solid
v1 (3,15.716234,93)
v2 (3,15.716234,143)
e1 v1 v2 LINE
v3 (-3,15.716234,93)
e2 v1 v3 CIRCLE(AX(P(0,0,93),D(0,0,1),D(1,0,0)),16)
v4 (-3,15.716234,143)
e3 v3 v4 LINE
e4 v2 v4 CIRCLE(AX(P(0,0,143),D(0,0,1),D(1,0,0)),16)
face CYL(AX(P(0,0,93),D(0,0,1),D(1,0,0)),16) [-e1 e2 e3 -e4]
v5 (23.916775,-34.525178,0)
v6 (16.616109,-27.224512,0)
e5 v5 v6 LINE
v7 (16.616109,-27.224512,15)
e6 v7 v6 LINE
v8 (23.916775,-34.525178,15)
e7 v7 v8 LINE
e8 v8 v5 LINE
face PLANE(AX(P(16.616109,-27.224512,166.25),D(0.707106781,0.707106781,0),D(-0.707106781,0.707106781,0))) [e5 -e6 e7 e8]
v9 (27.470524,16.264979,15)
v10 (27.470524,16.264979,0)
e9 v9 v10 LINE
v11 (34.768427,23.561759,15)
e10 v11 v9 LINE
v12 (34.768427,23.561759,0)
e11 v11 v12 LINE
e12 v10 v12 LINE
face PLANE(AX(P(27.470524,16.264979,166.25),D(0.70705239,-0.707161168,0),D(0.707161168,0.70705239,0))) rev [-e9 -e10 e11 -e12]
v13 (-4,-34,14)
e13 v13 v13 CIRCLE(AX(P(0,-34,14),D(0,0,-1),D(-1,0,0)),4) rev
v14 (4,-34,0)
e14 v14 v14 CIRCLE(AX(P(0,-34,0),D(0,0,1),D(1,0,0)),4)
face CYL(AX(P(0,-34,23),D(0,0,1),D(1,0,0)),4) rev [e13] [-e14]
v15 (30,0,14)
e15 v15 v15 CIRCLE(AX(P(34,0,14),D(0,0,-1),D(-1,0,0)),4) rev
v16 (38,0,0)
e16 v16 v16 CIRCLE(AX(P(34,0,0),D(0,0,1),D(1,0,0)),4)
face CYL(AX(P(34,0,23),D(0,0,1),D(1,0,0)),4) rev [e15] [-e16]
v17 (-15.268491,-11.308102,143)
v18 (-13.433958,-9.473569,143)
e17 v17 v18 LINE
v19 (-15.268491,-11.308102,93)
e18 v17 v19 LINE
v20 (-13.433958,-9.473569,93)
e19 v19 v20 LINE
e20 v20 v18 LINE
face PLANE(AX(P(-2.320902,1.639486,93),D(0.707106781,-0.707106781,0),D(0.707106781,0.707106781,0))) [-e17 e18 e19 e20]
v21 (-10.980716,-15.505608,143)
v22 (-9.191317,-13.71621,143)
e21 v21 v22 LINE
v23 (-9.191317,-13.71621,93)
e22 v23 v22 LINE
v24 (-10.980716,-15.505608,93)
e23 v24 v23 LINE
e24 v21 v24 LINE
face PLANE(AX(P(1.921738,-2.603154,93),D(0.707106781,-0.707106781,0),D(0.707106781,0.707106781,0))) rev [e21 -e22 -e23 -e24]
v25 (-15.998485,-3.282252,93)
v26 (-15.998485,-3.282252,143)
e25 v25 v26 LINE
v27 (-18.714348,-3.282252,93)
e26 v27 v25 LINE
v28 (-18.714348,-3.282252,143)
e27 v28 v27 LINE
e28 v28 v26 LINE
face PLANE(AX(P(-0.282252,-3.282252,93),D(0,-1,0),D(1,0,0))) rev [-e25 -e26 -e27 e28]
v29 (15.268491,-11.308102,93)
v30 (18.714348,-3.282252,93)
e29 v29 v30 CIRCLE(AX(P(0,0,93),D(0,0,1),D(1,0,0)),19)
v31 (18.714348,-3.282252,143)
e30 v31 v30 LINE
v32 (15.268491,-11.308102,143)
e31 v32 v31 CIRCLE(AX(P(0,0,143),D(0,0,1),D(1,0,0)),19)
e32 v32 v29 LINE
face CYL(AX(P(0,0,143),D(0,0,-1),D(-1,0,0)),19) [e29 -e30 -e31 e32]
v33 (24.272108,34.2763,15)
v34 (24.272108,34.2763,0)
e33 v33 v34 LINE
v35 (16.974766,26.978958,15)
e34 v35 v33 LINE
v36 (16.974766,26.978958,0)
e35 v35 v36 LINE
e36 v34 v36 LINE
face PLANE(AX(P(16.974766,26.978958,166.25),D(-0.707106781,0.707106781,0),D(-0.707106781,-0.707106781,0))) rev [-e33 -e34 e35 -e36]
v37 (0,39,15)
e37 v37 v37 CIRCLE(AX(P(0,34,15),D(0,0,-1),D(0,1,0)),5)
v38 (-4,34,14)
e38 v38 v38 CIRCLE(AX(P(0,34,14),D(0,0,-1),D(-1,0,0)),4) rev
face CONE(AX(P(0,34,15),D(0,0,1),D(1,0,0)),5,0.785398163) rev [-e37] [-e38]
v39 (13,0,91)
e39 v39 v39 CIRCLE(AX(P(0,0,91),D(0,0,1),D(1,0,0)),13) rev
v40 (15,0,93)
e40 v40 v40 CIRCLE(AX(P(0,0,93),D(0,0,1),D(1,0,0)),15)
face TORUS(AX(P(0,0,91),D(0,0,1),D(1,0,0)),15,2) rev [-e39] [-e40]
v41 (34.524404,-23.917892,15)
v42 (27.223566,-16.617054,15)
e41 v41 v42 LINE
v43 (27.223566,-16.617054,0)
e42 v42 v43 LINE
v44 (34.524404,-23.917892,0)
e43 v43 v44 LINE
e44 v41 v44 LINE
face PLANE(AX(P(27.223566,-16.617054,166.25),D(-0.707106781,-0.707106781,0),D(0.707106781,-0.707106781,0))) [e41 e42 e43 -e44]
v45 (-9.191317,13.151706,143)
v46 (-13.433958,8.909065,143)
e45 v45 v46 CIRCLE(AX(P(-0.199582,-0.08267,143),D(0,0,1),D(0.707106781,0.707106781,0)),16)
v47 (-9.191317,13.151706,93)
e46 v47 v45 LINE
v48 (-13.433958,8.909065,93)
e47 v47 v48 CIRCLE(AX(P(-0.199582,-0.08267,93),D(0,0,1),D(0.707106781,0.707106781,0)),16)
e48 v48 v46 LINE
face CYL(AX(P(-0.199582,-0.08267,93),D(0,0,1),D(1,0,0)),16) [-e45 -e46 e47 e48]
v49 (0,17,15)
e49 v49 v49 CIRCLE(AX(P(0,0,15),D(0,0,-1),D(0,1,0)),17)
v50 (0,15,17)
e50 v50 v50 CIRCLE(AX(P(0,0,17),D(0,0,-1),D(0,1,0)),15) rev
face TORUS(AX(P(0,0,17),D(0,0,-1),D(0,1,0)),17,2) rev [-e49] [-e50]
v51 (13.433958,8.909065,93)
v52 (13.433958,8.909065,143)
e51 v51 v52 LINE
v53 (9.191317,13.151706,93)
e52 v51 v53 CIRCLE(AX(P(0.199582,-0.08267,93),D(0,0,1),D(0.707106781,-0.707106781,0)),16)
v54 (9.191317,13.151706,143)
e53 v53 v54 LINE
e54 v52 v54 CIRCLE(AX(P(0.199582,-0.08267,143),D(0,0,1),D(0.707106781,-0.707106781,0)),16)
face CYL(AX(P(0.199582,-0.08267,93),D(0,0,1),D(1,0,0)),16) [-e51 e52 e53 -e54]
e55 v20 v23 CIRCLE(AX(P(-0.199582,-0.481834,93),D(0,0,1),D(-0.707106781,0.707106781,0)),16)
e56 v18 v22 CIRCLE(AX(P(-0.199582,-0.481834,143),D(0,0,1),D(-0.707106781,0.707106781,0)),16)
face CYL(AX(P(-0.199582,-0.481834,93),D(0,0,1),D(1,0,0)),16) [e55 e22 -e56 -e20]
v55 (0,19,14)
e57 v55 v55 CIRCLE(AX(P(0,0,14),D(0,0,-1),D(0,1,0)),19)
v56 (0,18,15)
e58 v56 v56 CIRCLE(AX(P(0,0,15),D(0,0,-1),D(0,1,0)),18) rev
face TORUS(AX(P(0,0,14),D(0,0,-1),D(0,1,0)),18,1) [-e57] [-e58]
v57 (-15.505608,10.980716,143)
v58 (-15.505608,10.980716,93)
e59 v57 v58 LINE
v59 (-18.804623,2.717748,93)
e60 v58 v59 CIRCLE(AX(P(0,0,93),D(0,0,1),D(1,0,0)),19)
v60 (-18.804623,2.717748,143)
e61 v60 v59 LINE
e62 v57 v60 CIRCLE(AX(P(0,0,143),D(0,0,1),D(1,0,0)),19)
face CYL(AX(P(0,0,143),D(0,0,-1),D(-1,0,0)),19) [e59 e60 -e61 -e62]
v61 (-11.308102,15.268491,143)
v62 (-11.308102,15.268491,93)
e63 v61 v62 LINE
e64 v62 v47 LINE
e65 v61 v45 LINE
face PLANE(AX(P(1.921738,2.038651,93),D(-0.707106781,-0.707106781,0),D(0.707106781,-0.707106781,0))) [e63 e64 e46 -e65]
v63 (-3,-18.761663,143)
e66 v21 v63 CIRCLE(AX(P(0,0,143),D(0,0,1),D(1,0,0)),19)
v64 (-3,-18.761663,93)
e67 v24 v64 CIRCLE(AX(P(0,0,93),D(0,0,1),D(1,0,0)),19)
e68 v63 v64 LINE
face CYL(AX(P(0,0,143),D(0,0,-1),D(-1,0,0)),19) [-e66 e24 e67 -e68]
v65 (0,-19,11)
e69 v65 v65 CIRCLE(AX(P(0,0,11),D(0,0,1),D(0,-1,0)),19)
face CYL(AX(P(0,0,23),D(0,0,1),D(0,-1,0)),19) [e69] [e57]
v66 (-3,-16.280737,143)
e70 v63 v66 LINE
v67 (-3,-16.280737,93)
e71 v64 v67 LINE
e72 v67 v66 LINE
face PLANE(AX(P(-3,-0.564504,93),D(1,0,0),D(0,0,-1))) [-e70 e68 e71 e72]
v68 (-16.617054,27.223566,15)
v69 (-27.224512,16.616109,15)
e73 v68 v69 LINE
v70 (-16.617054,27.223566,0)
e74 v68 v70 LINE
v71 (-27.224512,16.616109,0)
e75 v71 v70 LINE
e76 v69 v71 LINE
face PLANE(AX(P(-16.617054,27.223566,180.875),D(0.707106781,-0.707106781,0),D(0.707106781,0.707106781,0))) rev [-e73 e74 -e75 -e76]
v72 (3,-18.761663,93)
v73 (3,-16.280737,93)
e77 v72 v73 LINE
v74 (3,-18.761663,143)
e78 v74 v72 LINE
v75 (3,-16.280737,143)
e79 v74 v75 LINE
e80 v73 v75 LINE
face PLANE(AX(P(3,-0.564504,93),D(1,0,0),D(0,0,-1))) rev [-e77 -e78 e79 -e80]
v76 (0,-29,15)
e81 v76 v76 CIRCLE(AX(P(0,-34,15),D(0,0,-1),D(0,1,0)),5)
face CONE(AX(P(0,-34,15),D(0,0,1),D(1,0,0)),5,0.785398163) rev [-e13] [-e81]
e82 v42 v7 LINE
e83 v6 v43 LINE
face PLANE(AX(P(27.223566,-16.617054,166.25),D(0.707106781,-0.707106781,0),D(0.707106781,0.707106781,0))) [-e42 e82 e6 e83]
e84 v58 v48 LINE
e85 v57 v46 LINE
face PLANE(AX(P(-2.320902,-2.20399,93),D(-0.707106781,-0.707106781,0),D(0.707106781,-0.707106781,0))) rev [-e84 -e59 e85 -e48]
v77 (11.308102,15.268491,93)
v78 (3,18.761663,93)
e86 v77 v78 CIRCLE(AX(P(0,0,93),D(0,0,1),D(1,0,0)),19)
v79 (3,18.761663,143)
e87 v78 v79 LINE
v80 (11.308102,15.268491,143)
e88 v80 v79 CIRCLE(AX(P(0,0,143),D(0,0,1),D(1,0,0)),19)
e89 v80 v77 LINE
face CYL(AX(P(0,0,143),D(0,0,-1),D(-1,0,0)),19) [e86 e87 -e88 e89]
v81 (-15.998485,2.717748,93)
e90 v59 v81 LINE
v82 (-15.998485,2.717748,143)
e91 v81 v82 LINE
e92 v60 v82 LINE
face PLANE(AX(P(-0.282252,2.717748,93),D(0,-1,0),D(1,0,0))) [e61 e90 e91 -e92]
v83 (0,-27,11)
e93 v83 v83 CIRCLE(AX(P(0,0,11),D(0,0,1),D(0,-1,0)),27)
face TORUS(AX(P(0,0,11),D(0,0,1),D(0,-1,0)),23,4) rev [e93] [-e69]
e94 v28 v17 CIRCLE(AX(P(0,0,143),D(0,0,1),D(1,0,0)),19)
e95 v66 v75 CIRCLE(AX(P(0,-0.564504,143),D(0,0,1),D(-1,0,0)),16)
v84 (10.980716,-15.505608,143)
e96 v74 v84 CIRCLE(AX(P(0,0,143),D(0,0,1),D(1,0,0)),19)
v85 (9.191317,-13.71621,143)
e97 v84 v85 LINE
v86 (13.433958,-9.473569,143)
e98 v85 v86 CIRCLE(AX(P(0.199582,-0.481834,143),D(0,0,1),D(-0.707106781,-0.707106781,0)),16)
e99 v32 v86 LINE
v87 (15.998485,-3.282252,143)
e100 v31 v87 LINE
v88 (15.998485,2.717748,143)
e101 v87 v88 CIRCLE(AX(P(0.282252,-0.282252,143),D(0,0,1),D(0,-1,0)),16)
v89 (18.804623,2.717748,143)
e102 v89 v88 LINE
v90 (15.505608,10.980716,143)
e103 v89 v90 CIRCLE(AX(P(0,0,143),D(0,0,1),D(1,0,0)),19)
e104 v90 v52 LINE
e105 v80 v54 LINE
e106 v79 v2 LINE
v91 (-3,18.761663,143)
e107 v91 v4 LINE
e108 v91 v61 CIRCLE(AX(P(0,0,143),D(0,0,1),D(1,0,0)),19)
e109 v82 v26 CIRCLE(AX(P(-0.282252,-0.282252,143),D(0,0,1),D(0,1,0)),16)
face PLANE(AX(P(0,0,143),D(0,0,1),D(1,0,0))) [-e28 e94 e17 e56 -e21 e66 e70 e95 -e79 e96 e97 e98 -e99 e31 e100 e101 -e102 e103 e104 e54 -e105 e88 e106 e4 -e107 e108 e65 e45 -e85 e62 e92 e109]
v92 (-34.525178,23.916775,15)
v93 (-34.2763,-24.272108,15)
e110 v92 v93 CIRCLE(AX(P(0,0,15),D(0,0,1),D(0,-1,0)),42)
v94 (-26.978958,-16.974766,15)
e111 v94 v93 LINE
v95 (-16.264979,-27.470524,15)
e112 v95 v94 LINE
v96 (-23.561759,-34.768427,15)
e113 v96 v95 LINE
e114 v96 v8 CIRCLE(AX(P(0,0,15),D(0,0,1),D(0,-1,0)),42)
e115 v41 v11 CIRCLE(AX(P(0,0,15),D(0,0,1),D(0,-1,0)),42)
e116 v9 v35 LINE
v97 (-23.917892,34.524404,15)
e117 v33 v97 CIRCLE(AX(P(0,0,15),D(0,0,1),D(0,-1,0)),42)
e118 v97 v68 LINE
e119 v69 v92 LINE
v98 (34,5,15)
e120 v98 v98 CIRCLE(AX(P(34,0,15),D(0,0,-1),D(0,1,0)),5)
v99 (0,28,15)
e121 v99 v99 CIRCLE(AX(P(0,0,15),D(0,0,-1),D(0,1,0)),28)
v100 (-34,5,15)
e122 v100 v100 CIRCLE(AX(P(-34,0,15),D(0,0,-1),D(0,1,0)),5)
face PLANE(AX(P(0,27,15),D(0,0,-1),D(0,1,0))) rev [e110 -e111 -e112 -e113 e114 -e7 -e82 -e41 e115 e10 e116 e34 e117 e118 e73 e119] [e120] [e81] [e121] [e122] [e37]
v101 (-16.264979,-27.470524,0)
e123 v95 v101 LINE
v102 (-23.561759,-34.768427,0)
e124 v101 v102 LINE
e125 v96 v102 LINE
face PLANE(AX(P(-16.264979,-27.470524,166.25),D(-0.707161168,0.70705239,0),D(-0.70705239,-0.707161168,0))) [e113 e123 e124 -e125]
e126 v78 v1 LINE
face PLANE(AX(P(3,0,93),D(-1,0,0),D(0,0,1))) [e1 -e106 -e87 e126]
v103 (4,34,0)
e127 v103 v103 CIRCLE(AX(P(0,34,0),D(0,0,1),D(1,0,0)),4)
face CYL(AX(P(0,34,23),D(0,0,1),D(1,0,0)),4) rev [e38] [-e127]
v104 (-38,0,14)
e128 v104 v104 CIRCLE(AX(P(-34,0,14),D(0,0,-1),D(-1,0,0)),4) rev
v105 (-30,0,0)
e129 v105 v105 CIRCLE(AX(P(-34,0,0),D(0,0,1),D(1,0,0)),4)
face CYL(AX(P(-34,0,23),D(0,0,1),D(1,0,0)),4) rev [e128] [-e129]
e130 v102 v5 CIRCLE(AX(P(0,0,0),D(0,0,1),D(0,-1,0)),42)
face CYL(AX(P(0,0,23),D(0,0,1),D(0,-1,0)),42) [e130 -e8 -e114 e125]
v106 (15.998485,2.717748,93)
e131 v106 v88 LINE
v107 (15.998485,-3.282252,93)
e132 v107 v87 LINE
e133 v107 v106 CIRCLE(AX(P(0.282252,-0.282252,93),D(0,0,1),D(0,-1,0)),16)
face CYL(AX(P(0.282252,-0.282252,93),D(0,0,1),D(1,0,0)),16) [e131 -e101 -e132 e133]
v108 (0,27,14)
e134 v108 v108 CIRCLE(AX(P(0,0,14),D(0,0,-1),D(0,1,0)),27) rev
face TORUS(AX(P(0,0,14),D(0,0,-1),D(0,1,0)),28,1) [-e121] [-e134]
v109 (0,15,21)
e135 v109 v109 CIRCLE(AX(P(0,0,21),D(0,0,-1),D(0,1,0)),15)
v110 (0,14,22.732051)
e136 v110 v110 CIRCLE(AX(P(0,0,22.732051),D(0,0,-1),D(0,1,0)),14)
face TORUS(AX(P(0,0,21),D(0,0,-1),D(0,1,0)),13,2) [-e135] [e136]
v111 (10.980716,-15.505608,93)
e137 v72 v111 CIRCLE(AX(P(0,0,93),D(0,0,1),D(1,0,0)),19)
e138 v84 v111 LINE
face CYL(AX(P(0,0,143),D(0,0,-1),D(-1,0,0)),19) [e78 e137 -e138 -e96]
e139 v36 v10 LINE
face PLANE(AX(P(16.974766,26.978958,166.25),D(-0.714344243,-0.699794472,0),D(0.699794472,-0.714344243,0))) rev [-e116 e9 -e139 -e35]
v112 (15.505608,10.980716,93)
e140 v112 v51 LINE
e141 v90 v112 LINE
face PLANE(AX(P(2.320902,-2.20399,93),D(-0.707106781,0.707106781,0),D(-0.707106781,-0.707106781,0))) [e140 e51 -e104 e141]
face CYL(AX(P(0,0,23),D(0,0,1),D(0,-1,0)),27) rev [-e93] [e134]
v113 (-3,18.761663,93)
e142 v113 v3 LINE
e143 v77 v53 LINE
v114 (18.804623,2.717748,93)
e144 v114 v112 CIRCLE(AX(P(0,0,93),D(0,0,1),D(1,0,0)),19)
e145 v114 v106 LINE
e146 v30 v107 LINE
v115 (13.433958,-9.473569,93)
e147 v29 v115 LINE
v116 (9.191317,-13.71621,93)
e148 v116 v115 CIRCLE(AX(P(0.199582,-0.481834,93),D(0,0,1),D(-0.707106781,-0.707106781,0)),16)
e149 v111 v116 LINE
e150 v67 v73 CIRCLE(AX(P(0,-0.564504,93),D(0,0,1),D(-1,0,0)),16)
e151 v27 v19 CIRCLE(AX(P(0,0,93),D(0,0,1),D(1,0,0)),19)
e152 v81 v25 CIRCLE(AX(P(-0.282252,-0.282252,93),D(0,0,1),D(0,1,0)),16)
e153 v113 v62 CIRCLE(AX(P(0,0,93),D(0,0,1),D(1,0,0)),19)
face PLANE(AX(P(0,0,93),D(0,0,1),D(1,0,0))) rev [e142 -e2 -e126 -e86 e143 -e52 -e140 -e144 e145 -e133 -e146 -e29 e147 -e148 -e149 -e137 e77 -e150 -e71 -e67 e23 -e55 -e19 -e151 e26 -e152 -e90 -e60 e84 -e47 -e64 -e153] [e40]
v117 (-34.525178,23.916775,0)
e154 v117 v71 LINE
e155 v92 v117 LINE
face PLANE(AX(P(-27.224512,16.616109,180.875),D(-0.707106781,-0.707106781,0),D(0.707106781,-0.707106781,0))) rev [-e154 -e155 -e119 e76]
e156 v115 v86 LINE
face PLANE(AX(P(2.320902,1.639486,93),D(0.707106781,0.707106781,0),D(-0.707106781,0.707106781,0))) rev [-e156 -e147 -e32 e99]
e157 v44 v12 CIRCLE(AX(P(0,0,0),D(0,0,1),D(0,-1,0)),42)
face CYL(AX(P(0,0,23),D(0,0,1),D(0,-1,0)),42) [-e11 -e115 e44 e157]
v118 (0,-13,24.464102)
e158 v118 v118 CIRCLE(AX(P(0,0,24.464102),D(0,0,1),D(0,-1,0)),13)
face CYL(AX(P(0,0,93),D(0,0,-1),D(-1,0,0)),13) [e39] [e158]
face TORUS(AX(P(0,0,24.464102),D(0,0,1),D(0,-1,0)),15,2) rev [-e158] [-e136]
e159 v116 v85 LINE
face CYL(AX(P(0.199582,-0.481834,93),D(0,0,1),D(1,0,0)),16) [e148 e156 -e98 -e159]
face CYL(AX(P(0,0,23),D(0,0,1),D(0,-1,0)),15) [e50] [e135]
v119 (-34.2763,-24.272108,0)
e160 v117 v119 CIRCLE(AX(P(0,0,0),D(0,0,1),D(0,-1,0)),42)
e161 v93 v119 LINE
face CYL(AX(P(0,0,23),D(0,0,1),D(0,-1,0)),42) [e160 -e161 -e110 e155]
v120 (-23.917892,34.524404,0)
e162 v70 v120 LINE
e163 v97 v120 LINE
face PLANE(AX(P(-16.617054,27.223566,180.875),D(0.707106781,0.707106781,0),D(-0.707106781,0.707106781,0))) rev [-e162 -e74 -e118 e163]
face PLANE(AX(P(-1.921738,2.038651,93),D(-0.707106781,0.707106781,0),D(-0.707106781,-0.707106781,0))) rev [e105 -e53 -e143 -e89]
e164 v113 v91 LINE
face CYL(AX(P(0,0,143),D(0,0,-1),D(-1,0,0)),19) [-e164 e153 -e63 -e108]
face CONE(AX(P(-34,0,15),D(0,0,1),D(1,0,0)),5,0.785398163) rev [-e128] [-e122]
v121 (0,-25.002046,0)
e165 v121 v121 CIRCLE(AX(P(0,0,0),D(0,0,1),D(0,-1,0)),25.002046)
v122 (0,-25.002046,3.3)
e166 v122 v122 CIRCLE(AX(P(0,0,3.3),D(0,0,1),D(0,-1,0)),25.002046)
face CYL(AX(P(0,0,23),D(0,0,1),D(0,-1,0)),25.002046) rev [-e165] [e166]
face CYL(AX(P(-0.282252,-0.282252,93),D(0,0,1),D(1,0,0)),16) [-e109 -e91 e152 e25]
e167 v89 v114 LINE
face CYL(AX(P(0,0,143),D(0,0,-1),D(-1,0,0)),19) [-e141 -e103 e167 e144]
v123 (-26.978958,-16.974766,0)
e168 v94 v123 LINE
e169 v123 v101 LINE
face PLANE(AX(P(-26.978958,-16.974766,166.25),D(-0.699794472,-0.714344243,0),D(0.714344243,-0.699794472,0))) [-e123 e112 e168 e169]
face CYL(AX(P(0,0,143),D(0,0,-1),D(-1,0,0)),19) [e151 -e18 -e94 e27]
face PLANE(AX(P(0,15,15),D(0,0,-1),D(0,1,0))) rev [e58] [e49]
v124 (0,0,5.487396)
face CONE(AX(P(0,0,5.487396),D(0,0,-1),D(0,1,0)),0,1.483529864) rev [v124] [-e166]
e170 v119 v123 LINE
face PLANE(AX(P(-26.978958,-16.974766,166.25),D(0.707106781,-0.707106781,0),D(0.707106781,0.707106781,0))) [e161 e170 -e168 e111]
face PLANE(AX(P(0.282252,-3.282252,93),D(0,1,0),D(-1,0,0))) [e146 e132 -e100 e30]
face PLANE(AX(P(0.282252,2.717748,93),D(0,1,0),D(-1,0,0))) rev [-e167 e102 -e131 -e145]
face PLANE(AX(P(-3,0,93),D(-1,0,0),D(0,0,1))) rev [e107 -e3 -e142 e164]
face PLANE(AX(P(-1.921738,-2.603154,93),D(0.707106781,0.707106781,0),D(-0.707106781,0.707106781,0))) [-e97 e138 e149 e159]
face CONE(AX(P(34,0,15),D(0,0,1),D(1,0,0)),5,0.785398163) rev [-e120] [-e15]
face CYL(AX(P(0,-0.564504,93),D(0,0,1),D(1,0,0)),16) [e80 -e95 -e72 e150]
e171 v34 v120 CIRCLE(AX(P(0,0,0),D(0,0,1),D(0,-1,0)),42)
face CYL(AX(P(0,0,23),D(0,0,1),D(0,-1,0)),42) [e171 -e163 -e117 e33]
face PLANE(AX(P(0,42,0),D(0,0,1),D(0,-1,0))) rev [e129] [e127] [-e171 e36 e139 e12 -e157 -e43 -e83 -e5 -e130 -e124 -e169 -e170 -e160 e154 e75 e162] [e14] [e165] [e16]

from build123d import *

# Parameters (mm, degrees)
F_8_0MM_DOWEL_HOLE1_D           = 8
F_8_0MM_DOWEL_HOLE1_CSINK_D     = 8.05
F_8_0MM_DOWEL_HOLE1_CSINK_ANGLE = 90
CUT_EXTRUDE1_DEPTH              = 62.26173357
CUT_EXTRUDE2_DEPTH              = 62.26173357
SKETCH12_R                      = 13
BOSS_EXTRUDE3_DEPTH             = 70
SKETCH16_R                      = 19
BOSS_EXTRUDE4_DEPTH             = 50
CUT_EXTRUDE5_START              = -50
CUT_EXTRUDE5_DEPTH              = 50
CIRPATTERN2_COUNT               = 8
FILLET1_R                       = 2
FILLET2_R                       = 2
FILLET3_R                       = 1
FILLET4_R                       = 1
CHAMFER2_SIZE                   = 1


with BuildPart() as part:
    # Sketch1 → Revolve1 (revolve)
    with BuildSketch(Plane(origin=(0, 0, 0), x_dir=(0, 0, -1), z_dir=(1, 0, 0)), mode=Mode.PRIVATE) as revolve1_sk:
        with BuildLine():
            Line((-23, 0), (-23, 15))
            Line((-23, 15), (-15, 15))
            Line((-15, 15), (-15, 19))
            Line((-15, 19), (-11, 19))
            ThreePointArc((-11, 19), (-7, 23), (-11, 27))
            Line((-11, 27), (-15, 27))
            Line((-15, 27), (-15, 42))
            Line((-15, 42), (0, 42))
            Line((0, 42), (0, 25.002045875))
            Line((0, 25.002045875), (-3.3, 25.002045875))
            Line((-3.3, 25.002045875), (-5.487395579, 0))
            Line((-5.487395579, 0), (-23, 0))
        make_face()
    revolve(revolve1_sk.sketch.rotate(Axis((0, 0, 23), (0, 0, -1)), 180), axis=Axis((0, 0, 23), (0, 0, -1)))

    # Ø8.0mm Dowel Hole1 (through all)
    with Locations(Plane.XY.offset(23)):
        with Locations((34, 0), (0, 34), (-34, 0), (0, -34)):
            CounterSinkHole(F_8_0MM_DOWEL_HOLE1_D / 2, F_8_0MM_DOWEL_HOLE1_CSINK_D / 2, counter_sink_angle=F_8_0MM_DOWEL_HOLE1_CSINK_ANGLE)

    # Sketch8 → Cut-Extrude1 (cut, symmetric)
    with BuildSketch(Plane.XY.offset(15)):
        Polygon((-184.432885046, 173.824482377), (-34.525177502, 23.916774834), (-27.224511551, 16.616108883), (-16.617054317, 27.223566117), (-23.917891868, 34.524403668), (-173.825599411, 184.432111212), (-473.645864656, 484.242676064), (-484.25315029, 473.63504723), align=None)
    cut_extrude1 = extrude(amount=CUT_EXTRUDE1_DEPTH, both=True, mode=Mode.SUBTRACT)

    # Mirror1: Cut-Extrude1 across plane
    add(cut_extrude1.mirror(Plane(origin=(0, 0, 0), x_dir=(0, 0, 1), z_dir=(-0.7071067811865487, 0.7071067811865464, 0))), mode=Mode.SUBTRACT)

    # Sketch9 → Cut-Extrude2 (cut, symmetric)
    with BuildSketch(Plane.XY.offset(15)):
        Polygon((174.24220549, 184.246397636), (24.272108184, 34.27630033), (16.974766202, 26.978958348), (27.470523572, 16.26497852), (34.768426829, 23.561759184), (184.750059076, 173.520320661), (487.756770128, 470.362321977), (477.248916541, 481.088398951), align=None)
    cut_extrude2 = extrude(amount=CUT_EXTRUDE2_DEPTH, both=True, mode=Mode.SUBTRACT)

    # Mirror4: Cut-Extrude2 across plane
    add(cut_extrude2.mirror(Plane(origin=(0, 0, 0), x_dir=(0, 0, 1), z_dir=(-0.7071067811865439, -0.7071067811865512, 0))), mode=Mode.SUBTRACT)

    # Sketch12 → Boss-Extrude3 (add)
    with BuildSketch(Plane.XY.offset(23)):
        Circle(SKETCH12_R)
    extrude(amount=BOSS_EXTRUDE3_DEPTH)

    # Sketch16 → Boss-Extrude4 (add)
    with BuildSketch(Plane.XY.offset(93)):
        with Locations(Location((0, 0, 0), (0, 0, 270))):
            Circle(SKETCH16_R)
    extrude(amount=BOSS_EXTRUDE4_DEPTH)

    # Sketch18 → Cut-Extrude5 (cut)
    with BuildSketch(Plane.XY.offset(143).offset(CUT_EXTRUDE5_START)):
        with BuildLine():
            ThreePointArc((3, 18.761663039), (0, 19), (-3, 18.761663039))
            Line((-3, 18.761663039), (-3, 15.716233646))
            ThreePointArc((-3, 15.716233646), (0, 16), (3, 15.716233646))
            Line((3, 15.716233646), (3, 18.761663039))
        make_face()
    cut_extrude5 = extrude(amount=CUT_EXTRUDE5_DEPTH, mode=Mode.SUBTRACT)

    # CirPattern2: Cut-Extrude5 ×8 about axis
    cirpattern2_axis = Axis((0, -0.282251763, 0), (0, 0, 1))
    for i in range(1, CIRPATTERN2_COUNT):
        add(cut_extrude5.rotate(cirpattern2_axis, i * 360 / CIRPATTERN2_COUNT), mode=Mode.SUBTRACT)

    # Fillet1
    fillet1_edges = [part.edges().sort_by_distance(p)[0] for p in [
        (0, 15, 15),
        (-13, 0, 93),
        (0, 15, 23),
    ]]
    fillet(fillet1_edges, radius=FILLET1_R - 0.0001)  # a hair under: the kernel refuses the full size

    # Fillet2
    fillet2_edges = [part.edges().sort_by_distance(p)[0] for p in [
        (-13, 0, 23),
    ]]
    fillet(fillet2_edges, radius=FILLET2_R)

    # Fillet3
    fillet3_edges = [part.edges().sort_by_distance(p)[0] for p in [
        (0, 19, 15),
    ]]
    fillet(fillet3_edges, radius=FILLET3_R)

    # Fillet4
    fillet4_edges = [part.edges().sort_by_distance(p)[0] for p in [
        (0, 27, 15),
    ]]
    fillet(fillet4_edges, radius=FILLET4_R)

    # Chamfer2
    chamfer2_edges = [part.edges().sort_by_distance(p)[0] for p in [
        (38, 0, 15),
        (4, -34, 15),
        (-30, 0, 15),
        (4, 34, 15),
    ]]
    chamfer(chamfer2_edges, length=CHAMFER2_SIZE)


solid = part.part
